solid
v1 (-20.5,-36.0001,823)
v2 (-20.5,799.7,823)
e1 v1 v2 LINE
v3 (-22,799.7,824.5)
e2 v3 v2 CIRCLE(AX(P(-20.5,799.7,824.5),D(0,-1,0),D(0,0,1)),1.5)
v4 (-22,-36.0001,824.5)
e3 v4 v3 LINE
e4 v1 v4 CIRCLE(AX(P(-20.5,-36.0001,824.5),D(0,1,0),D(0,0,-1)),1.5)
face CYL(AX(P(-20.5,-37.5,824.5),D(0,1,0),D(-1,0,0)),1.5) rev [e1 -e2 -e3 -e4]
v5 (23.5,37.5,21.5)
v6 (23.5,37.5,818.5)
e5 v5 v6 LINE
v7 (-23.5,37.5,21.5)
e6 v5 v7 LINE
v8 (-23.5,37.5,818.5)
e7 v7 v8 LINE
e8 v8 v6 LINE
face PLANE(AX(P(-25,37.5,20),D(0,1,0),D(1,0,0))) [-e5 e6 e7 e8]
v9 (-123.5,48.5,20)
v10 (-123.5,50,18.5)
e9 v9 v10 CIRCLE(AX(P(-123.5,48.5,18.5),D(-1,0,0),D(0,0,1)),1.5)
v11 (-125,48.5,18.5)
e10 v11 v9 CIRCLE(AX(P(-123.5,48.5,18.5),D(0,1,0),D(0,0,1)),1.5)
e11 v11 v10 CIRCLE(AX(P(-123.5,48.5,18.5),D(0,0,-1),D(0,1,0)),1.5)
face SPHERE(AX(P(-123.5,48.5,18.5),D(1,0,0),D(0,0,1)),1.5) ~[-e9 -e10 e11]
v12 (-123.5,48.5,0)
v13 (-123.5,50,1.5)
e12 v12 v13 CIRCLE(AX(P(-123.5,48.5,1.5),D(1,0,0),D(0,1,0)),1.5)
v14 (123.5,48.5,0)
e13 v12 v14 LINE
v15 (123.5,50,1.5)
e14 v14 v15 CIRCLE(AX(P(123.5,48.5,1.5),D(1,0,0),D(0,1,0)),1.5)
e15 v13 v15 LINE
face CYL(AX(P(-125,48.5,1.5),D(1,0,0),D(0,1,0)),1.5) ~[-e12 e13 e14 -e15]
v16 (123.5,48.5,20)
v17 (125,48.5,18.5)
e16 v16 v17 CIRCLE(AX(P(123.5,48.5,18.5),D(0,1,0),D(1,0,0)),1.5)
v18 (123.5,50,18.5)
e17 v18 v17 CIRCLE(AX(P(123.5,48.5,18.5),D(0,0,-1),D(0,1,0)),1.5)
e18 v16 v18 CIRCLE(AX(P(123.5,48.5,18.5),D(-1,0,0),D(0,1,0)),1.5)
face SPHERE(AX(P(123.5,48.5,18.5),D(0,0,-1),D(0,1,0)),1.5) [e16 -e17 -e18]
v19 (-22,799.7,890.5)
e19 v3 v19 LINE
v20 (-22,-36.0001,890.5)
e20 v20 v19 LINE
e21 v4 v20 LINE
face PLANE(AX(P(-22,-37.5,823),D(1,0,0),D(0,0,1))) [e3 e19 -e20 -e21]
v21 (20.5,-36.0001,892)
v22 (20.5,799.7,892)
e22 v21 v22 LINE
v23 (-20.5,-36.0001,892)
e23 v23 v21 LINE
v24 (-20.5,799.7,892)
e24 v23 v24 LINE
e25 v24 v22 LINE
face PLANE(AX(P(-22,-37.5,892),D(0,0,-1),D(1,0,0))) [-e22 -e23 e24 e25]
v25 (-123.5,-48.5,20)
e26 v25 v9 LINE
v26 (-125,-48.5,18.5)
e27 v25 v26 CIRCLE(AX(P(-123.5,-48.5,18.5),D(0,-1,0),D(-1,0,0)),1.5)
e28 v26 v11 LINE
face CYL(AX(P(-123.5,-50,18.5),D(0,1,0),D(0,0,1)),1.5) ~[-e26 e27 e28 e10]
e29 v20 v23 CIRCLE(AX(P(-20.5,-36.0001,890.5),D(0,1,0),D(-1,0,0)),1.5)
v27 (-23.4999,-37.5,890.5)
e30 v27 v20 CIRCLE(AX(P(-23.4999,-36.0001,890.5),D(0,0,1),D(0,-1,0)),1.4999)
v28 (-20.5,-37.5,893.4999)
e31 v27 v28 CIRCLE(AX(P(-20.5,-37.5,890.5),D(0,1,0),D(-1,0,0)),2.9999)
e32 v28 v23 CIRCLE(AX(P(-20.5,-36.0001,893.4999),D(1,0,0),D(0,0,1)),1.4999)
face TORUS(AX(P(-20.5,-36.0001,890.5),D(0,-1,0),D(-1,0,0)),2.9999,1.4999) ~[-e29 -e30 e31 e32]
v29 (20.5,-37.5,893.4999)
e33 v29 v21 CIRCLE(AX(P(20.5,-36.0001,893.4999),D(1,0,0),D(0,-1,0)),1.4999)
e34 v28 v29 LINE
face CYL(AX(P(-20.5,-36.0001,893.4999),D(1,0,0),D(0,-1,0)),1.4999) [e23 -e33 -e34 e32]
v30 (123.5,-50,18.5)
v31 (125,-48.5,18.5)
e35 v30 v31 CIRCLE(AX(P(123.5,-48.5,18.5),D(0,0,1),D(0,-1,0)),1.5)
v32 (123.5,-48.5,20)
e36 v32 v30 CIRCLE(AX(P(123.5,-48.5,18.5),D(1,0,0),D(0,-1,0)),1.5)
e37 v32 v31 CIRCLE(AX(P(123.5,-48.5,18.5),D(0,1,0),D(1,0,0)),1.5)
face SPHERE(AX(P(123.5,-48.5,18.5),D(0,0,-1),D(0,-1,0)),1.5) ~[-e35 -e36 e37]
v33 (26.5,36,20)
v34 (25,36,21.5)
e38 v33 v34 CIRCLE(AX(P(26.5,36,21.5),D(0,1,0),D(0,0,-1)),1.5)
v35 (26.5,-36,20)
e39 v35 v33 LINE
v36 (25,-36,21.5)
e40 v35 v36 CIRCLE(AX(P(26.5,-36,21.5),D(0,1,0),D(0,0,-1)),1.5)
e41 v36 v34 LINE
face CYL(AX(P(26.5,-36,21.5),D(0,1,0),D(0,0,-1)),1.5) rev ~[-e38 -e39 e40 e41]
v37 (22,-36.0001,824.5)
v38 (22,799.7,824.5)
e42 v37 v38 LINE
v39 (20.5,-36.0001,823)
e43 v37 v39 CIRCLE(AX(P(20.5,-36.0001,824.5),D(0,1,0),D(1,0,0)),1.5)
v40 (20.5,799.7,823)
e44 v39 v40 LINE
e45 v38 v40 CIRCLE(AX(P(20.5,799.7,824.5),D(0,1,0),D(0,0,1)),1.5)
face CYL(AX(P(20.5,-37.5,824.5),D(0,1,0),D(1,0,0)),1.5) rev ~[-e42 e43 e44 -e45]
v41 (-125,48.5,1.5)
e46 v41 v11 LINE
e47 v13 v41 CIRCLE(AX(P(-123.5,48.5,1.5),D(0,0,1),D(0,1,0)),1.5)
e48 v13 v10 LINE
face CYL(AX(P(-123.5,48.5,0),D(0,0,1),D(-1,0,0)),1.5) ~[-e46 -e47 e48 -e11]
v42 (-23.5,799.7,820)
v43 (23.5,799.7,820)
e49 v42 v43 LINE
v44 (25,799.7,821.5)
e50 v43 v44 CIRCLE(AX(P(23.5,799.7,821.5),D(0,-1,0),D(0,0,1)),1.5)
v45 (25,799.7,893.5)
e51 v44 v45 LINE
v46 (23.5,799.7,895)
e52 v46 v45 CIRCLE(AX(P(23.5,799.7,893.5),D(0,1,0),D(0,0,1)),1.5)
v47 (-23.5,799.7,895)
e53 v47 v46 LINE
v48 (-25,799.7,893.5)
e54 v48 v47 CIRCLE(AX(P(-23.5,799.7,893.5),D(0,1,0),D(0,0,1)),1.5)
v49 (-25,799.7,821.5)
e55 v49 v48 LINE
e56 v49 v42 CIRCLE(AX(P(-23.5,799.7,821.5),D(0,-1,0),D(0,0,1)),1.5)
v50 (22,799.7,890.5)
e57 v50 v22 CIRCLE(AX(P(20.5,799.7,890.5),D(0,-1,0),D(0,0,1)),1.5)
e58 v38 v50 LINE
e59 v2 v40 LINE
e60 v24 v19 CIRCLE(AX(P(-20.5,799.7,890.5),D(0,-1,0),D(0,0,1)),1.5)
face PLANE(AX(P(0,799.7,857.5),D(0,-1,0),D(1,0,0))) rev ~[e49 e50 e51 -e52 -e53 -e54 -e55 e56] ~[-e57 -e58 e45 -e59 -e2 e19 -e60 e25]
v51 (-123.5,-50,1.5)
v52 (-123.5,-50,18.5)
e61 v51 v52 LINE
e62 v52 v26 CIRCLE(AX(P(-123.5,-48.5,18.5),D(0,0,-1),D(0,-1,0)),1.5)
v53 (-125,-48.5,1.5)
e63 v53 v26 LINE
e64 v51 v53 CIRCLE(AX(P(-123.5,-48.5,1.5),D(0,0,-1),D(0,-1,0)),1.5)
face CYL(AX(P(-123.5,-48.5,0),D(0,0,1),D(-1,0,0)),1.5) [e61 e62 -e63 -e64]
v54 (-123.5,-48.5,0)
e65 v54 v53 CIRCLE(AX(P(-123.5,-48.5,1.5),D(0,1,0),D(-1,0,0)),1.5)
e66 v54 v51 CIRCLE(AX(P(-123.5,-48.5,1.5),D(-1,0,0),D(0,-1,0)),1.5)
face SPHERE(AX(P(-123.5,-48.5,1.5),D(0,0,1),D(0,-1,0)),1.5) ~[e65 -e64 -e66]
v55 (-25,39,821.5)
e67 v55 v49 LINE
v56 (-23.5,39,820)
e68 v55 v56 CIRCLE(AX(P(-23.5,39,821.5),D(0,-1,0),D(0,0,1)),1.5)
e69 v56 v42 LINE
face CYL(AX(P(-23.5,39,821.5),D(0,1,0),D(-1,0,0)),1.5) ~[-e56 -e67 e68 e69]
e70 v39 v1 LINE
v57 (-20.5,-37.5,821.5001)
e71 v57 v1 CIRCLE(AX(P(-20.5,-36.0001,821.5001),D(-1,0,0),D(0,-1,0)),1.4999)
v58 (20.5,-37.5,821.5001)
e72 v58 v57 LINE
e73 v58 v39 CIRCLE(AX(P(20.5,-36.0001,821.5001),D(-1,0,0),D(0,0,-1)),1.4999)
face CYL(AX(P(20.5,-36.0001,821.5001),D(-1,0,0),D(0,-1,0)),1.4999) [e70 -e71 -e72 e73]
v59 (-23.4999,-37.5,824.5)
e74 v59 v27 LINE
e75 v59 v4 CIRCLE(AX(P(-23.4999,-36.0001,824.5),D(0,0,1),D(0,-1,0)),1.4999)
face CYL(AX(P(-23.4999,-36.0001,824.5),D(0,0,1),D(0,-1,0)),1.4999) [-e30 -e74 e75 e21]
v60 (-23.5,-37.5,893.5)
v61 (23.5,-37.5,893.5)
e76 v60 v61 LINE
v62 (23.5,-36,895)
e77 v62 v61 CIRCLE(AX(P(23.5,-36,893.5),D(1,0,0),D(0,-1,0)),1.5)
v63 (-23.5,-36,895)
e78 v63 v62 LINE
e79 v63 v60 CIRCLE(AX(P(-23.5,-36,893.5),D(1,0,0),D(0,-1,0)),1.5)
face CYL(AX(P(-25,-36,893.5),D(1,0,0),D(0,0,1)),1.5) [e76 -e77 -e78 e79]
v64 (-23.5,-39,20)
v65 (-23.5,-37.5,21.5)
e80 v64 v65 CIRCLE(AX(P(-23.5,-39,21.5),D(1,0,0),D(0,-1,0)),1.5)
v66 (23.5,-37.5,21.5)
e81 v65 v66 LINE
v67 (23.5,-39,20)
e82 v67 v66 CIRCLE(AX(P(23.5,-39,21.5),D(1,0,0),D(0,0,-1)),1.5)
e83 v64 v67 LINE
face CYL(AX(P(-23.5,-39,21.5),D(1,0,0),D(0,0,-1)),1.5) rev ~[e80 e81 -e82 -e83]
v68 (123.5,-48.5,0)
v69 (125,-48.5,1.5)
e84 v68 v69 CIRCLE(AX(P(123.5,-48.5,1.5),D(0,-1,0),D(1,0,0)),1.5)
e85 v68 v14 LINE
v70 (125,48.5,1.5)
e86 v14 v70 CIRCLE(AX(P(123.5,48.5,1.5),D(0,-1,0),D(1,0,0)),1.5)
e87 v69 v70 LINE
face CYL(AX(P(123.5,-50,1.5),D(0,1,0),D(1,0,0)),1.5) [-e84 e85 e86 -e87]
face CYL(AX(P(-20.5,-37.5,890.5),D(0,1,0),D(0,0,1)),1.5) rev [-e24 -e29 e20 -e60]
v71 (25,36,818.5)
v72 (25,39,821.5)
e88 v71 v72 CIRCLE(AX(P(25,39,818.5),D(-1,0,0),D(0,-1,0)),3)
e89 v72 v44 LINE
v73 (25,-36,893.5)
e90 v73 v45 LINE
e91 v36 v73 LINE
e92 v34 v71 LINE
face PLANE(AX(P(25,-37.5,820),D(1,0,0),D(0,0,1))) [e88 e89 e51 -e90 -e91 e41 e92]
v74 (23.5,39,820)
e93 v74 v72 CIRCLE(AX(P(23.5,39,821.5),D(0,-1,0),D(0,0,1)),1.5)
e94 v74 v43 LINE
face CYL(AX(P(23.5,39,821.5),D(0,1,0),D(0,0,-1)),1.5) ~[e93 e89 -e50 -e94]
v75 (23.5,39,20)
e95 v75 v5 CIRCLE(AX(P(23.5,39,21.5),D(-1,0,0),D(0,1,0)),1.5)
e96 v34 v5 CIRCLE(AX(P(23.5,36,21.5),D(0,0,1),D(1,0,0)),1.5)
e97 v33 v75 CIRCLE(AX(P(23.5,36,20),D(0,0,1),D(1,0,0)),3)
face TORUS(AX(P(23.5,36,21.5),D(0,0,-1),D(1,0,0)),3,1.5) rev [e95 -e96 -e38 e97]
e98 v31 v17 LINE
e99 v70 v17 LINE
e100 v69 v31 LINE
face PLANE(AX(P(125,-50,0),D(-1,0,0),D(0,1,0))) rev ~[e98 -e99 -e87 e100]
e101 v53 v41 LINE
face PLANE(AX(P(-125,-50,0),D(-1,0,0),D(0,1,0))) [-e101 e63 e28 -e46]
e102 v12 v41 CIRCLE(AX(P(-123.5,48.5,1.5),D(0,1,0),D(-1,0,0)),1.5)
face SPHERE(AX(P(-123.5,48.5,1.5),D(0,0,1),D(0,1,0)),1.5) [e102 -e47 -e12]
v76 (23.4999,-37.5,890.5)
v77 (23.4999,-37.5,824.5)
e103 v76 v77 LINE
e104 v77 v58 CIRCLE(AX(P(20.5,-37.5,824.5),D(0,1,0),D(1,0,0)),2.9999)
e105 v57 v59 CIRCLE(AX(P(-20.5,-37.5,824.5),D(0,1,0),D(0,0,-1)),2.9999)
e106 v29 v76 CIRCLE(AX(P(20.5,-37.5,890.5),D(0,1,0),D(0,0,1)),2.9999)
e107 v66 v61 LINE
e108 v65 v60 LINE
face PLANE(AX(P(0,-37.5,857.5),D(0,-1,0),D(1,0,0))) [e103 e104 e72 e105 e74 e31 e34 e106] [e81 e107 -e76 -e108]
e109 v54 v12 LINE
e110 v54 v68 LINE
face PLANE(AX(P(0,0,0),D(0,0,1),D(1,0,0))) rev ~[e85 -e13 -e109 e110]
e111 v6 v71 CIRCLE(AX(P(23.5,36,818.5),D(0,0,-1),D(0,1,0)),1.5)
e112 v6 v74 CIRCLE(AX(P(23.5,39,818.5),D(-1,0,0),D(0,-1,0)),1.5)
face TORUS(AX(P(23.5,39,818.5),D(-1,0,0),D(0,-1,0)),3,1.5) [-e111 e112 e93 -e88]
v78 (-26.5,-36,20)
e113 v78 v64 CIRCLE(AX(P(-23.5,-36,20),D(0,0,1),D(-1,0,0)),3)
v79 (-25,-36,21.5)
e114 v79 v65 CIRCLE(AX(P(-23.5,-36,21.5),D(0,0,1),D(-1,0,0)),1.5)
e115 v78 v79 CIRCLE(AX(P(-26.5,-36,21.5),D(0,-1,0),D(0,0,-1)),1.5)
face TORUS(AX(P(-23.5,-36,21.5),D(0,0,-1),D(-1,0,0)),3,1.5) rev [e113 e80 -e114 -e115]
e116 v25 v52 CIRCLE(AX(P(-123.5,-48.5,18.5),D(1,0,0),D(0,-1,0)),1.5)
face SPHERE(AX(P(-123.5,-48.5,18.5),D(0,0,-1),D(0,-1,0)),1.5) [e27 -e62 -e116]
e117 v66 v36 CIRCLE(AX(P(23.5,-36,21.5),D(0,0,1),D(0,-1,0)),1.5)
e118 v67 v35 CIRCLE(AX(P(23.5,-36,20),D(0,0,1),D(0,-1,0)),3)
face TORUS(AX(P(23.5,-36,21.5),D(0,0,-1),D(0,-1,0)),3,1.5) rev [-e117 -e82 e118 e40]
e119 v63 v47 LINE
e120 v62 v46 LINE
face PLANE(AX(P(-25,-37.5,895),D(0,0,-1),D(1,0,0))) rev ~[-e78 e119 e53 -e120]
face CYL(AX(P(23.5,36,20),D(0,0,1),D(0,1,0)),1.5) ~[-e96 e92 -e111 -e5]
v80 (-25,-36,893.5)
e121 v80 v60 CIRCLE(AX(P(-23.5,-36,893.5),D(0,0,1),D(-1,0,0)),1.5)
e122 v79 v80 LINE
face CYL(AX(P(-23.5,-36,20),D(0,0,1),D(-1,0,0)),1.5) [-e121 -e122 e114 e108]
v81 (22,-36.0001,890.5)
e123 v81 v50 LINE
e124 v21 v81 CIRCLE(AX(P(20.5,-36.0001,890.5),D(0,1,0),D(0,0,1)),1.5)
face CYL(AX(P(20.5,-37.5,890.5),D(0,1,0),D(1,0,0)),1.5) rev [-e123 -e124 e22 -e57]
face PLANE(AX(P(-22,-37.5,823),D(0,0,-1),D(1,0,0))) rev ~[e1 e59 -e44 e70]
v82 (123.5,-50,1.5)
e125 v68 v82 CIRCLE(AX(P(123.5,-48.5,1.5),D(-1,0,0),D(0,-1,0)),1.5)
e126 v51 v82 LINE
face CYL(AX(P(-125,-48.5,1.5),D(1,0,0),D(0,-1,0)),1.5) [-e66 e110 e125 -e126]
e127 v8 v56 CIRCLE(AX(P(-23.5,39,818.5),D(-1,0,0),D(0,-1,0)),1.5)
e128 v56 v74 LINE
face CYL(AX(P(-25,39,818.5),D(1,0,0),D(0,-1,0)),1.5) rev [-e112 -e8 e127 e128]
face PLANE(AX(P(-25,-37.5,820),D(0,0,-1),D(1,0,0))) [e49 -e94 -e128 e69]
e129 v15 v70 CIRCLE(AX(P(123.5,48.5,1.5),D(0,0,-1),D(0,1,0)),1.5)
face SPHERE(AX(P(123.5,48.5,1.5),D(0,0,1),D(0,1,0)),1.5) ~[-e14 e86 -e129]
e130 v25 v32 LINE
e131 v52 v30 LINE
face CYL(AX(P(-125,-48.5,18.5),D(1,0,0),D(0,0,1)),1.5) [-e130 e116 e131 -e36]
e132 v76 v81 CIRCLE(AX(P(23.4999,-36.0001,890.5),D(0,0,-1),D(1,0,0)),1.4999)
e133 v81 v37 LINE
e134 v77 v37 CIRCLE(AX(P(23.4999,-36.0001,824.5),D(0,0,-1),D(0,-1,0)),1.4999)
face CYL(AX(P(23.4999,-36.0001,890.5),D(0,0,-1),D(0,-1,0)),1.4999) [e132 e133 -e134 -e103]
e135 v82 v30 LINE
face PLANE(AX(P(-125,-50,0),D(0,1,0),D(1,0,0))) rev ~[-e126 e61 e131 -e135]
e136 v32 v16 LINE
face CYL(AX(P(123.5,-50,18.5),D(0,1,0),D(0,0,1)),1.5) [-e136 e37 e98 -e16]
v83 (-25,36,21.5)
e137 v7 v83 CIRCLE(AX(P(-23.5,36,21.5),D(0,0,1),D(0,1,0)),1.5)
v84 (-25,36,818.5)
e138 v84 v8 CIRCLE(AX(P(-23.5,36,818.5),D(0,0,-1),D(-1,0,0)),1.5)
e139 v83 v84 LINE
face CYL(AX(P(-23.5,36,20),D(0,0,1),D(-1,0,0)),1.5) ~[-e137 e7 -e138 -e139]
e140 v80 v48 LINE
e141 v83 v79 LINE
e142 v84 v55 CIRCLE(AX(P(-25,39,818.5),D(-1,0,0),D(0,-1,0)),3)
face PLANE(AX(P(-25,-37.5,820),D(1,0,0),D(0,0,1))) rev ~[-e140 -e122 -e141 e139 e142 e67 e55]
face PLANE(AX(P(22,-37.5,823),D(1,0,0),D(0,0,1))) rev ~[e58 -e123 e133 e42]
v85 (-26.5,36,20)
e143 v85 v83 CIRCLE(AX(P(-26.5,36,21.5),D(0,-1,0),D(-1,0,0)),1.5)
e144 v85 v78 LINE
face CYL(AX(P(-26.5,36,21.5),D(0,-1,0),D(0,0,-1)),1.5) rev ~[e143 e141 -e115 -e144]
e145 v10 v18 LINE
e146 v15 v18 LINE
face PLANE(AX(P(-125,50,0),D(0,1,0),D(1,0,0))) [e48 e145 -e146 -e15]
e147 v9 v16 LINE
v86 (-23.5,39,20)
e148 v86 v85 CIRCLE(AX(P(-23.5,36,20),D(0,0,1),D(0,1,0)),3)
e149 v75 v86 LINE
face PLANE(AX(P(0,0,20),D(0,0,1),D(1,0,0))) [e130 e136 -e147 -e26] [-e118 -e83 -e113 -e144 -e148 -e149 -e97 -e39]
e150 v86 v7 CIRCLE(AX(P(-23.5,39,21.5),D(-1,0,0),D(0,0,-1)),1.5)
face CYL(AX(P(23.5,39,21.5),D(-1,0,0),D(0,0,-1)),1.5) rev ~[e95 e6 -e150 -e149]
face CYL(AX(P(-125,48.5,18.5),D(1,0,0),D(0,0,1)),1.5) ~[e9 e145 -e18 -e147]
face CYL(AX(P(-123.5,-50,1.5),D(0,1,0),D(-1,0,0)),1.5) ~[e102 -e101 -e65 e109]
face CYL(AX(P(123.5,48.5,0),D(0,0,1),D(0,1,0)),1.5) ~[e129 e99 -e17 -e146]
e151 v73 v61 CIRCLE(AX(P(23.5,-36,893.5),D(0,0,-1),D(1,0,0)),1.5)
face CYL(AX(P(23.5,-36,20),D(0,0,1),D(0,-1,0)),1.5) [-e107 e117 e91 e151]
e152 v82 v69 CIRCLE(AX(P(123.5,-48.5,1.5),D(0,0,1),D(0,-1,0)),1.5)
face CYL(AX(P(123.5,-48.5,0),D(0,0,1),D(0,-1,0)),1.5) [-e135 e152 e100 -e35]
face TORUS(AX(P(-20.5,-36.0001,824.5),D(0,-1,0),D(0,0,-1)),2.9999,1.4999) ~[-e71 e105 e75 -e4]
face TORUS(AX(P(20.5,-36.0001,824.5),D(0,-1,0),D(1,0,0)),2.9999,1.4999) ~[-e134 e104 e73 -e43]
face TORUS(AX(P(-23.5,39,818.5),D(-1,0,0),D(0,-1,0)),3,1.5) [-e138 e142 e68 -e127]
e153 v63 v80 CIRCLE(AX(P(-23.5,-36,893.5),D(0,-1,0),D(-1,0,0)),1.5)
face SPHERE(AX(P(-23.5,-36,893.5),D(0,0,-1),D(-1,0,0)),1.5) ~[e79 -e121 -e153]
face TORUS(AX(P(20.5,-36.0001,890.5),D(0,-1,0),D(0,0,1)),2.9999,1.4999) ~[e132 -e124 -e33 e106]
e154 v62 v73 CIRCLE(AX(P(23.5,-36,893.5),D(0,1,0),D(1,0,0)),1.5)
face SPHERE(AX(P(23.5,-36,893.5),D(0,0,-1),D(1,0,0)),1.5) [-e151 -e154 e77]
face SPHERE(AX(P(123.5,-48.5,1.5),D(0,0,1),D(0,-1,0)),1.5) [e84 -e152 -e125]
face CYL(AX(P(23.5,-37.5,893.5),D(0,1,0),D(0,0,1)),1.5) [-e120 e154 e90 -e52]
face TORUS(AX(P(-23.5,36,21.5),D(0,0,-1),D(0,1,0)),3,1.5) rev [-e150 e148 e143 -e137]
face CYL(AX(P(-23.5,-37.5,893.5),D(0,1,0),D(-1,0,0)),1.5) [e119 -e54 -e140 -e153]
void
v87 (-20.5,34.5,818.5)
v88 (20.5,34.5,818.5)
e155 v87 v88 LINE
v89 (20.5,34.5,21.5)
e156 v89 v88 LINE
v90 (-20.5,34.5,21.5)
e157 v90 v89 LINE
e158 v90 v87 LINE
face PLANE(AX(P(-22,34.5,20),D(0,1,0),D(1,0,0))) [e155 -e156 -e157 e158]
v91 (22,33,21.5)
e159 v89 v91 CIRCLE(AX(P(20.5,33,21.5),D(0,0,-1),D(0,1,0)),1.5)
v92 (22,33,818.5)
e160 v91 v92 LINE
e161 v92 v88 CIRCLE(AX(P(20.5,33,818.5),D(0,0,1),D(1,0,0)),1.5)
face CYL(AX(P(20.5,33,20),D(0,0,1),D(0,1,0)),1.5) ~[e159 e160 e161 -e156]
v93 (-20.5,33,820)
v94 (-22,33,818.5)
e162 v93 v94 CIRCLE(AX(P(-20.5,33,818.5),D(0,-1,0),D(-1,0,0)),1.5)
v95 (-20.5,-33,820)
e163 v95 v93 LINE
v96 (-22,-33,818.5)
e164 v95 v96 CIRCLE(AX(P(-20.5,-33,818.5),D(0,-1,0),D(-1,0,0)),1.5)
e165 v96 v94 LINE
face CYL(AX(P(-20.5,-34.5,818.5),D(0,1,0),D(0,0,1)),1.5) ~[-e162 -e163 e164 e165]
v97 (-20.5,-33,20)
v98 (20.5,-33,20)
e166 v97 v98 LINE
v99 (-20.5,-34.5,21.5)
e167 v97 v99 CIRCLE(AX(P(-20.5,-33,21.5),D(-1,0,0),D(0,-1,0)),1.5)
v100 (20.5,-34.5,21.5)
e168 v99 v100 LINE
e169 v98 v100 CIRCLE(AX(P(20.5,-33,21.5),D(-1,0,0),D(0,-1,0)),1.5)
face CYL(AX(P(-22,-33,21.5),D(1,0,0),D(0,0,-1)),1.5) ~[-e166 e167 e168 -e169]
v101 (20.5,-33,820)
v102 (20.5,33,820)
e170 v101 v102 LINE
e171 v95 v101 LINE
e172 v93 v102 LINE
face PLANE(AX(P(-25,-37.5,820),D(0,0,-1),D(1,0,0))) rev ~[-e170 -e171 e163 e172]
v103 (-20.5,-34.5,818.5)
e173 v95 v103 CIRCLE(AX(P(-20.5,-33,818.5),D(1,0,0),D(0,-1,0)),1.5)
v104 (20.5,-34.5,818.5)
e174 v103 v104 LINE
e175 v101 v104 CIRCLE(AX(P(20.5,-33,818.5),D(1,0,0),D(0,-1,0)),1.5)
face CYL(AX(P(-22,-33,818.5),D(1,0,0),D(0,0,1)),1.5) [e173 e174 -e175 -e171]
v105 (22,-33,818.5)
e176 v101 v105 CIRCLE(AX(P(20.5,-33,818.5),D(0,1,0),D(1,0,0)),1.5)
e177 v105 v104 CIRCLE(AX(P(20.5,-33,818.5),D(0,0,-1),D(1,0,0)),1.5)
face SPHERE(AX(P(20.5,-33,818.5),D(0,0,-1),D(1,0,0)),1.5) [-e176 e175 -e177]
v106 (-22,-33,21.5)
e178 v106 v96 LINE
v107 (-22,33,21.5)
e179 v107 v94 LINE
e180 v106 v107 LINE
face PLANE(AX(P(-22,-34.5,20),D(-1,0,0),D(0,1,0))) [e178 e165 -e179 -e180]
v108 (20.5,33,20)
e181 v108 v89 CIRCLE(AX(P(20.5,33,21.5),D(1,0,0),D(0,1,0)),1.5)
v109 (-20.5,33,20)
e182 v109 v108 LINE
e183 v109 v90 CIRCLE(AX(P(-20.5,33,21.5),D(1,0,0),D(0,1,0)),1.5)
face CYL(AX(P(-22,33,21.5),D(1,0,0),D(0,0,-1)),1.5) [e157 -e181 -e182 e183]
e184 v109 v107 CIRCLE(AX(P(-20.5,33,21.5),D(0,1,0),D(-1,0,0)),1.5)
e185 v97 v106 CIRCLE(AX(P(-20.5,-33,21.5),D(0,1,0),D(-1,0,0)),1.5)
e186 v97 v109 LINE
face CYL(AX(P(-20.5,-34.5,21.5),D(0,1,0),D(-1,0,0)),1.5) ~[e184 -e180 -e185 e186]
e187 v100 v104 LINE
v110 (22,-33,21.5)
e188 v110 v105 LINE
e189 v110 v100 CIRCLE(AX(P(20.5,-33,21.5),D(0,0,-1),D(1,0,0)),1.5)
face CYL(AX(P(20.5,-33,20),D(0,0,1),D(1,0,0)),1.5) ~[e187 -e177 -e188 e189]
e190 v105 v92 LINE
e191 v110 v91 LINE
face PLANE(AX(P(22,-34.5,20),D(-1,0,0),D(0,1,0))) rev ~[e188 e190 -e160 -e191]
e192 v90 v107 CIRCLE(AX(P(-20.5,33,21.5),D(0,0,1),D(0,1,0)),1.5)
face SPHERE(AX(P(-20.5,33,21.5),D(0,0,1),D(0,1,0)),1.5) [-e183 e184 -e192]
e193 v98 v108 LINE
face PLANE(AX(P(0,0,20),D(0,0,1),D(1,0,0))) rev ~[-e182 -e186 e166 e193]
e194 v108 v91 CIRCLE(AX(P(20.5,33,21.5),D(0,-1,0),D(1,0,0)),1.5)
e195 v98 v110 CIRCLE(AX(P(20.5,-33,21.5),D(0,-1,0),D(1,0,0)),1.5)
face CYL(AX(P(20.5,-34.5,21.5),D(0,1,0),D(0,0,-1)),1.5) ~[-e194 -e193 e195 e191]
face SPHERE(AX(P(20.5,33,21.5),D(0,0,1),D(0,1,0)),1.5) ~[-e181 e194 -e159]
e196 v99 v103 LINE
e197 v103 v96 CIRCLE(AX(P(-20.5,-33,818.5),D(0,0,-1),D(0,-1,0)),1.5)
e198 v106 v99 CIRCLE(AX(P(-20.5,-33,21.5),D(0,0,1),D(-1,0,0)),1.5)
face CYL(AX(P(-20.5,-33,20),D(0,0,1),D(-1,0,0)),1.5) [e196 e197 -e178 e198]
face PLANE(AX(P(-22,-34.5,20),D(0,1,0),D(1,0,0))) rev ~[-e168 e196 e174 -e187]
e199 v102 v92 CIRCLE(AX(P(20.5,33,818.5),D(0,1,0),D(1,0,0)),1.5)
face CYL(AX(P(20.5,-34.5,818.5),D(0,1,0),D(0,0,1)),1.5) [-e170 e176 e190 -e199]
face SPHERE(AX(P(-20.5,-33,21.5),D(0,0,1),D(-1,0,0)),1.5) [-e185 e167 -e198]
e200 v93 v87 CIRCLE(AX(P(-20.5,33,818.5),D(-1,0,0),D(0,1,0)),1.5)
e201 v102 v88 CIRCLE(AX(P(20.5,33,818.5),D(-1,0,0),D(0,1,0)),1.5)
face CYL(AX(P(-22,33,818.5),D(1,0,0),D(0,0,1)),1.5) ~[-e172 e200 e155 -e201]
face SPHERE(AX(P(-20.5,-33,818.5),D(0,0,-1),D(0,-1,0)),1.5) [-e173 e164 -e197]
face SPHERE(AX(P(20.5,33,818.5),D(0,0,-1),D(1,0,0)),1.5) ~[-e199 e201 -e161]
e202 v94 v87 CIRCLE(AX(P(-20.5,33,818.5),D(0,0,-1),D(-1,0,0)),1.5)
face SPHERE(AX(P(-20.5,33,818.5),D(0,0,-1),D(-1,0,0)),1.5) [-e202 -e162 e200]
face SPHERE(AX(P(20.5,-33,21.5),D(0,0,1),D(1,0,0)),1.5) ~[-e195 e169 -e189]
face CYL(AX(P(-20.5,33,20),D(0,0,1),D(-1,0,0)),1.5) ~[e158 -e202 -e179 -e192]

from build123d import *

# Parameters (mm, degrees)
F0_W     = 250
F0_H     = 100
F1_DEPTH = 20
F2_W     = 50
F2_H     = 75
F2_W_2   = 44
F2_H_2   = 69
F3_DEPTH = 800
F4_W     = 50
F4_H     = 75
F4_W_2   = 44
F4_H_2   = 69
F5_DEPTH = 837.2
F6_F1_R  = 1.5
F6_F2_R  = 1.5
F6_F3_R  = 1.5
F6_F4_R  = 1.4999


# Not quite as in the source:
# - a fillet or chamfer is up to 0.001 mm smaller than in the source, because OpenCascade refuses the exact size


with BuildPart() as f1:
    # F0 (on Top) → F1 (new body)
    with BuildSketch(Plane.XY):
        Rectangle(F0_W, F0_H)
    extrude(amount=F1_DEPTH)

    # F2 (on face) → F3 (join)
    with BuildSketch(Plane.XY.offset(20)):
        Rectangle(F2_W, F2_H)
        Rectangle(F2_W_2, F2_H_2, mode=Mode.SUBTRACT)
    extrude(amount=F3_DEPTH)

    # F4 (on face) → F5 (join)
    with BuildSketch(Plane.XZ.offset(37.5)):
        with Locations((0, 857.5)):
            Rectangle(F4_W, F4_H)
        with Locations((0, 857.5)):
            Rectangle(F4_W_2, F4_H_2, mode=Mode.SUBTRACT)
    extrude(amount=-F5_DEPTH)

    # F6: fillet of radius 1.5 on 44 edges, made by hand

    # F6_f1
    f6_f1_edges = [f1.edges().sort_by_distance(p)[0] for p in [
        (-22, -34.5, 420),
        (22, 34.5, 420),
        (22, -34.5, 420),
        (-22, 34.5, 420),
        (-22, 381.1, 892),
        (22, 381.1, 892),
        (0, 37.5, 820),
        (22, 381.1, 823),
        (-22, 381.1, 823),
        (22, 0, 820),
        (0, -34.5, 820),
        (-22, 0, 820),
        (0, 34.5, 820),
        (0, 34.5, 20),
        (-22, 0, 20),
        (22, 0, 20),
        (0, -34.5, 20),
    ]]
    fillet(f6_f1_edges, radius=F6_F1_R)

    # F6_f2
    f6_f2_edges = [f1.edges().sort_by_distance(p)[0] for p in [
        (-25, -37.5, 457.5),
        (25, 37.5, 419.25),
        (25, -37.5, 457.5),
        (-25, 37.5, 419.25),
        (25, 381.1, 895),
        (-25, 381.1, 895),
        (0, -37.5, 895),
        (125, -50, 10),
        (-125, -50, 10),
        (125, 50, 10),
        (0, -50, 0),
        (0, -50, 20),
        (0, 50, 20),
        (125, 0, 20),
        (-125, 0, 20),
        (-125, 50, 10),
        (0, 50, 0),
        (125, 0, 0),
        (-125, 0, 0),
        (-25, 37.9393398282, 819.5606601718),
        (25, 37.9393398282, 819.5606601718),
    ]]
    fillet(f6_f2_edges, radius=F6_F2_R)

    # F6_f3
    f6_f3_edges = [f1.edges().sort_by_distance(p)[0] for p in [
        (25, 0, 20),
        (-25, 0, 20),
        (0, -37.5, 20),
        (0, 37.5, 20),
        (24.5606601718, 37.0606601718, 20),
        (-24.5606601718, 37.0606601718, 20),
        (-24.5606601718, -37.0606601718, 20),
        (24.5606601718, -37.0606601718, 20),
    ]]
    fillet(f6_f3_edges, radius=F6_F3_R)

    # F6_f4 (radius 1.5 in the source; OpenCascade refuses exactly that, so slightly less here)
    f6_f4_edges = [f1.edges().sort_by_distance(p)[0] for p in [
        (-22, -37.5, 857.5),
        (0, -37.5, 823),
        (0, -37.5, 892),
        (22, -37.5, 857.5),
        (21.5606601718, -37.5, 891.5606601718),
        (21.5606601718, -37.5, 823.4393398282),
        (-21.5606601718, -37.5, 891.5606601718),
        (-21.5606601718, -37.5, 823.4393398282),
    ]]
    fillet(f6_f4_edges, radius=F6_F4_R)


solid = f1.part
